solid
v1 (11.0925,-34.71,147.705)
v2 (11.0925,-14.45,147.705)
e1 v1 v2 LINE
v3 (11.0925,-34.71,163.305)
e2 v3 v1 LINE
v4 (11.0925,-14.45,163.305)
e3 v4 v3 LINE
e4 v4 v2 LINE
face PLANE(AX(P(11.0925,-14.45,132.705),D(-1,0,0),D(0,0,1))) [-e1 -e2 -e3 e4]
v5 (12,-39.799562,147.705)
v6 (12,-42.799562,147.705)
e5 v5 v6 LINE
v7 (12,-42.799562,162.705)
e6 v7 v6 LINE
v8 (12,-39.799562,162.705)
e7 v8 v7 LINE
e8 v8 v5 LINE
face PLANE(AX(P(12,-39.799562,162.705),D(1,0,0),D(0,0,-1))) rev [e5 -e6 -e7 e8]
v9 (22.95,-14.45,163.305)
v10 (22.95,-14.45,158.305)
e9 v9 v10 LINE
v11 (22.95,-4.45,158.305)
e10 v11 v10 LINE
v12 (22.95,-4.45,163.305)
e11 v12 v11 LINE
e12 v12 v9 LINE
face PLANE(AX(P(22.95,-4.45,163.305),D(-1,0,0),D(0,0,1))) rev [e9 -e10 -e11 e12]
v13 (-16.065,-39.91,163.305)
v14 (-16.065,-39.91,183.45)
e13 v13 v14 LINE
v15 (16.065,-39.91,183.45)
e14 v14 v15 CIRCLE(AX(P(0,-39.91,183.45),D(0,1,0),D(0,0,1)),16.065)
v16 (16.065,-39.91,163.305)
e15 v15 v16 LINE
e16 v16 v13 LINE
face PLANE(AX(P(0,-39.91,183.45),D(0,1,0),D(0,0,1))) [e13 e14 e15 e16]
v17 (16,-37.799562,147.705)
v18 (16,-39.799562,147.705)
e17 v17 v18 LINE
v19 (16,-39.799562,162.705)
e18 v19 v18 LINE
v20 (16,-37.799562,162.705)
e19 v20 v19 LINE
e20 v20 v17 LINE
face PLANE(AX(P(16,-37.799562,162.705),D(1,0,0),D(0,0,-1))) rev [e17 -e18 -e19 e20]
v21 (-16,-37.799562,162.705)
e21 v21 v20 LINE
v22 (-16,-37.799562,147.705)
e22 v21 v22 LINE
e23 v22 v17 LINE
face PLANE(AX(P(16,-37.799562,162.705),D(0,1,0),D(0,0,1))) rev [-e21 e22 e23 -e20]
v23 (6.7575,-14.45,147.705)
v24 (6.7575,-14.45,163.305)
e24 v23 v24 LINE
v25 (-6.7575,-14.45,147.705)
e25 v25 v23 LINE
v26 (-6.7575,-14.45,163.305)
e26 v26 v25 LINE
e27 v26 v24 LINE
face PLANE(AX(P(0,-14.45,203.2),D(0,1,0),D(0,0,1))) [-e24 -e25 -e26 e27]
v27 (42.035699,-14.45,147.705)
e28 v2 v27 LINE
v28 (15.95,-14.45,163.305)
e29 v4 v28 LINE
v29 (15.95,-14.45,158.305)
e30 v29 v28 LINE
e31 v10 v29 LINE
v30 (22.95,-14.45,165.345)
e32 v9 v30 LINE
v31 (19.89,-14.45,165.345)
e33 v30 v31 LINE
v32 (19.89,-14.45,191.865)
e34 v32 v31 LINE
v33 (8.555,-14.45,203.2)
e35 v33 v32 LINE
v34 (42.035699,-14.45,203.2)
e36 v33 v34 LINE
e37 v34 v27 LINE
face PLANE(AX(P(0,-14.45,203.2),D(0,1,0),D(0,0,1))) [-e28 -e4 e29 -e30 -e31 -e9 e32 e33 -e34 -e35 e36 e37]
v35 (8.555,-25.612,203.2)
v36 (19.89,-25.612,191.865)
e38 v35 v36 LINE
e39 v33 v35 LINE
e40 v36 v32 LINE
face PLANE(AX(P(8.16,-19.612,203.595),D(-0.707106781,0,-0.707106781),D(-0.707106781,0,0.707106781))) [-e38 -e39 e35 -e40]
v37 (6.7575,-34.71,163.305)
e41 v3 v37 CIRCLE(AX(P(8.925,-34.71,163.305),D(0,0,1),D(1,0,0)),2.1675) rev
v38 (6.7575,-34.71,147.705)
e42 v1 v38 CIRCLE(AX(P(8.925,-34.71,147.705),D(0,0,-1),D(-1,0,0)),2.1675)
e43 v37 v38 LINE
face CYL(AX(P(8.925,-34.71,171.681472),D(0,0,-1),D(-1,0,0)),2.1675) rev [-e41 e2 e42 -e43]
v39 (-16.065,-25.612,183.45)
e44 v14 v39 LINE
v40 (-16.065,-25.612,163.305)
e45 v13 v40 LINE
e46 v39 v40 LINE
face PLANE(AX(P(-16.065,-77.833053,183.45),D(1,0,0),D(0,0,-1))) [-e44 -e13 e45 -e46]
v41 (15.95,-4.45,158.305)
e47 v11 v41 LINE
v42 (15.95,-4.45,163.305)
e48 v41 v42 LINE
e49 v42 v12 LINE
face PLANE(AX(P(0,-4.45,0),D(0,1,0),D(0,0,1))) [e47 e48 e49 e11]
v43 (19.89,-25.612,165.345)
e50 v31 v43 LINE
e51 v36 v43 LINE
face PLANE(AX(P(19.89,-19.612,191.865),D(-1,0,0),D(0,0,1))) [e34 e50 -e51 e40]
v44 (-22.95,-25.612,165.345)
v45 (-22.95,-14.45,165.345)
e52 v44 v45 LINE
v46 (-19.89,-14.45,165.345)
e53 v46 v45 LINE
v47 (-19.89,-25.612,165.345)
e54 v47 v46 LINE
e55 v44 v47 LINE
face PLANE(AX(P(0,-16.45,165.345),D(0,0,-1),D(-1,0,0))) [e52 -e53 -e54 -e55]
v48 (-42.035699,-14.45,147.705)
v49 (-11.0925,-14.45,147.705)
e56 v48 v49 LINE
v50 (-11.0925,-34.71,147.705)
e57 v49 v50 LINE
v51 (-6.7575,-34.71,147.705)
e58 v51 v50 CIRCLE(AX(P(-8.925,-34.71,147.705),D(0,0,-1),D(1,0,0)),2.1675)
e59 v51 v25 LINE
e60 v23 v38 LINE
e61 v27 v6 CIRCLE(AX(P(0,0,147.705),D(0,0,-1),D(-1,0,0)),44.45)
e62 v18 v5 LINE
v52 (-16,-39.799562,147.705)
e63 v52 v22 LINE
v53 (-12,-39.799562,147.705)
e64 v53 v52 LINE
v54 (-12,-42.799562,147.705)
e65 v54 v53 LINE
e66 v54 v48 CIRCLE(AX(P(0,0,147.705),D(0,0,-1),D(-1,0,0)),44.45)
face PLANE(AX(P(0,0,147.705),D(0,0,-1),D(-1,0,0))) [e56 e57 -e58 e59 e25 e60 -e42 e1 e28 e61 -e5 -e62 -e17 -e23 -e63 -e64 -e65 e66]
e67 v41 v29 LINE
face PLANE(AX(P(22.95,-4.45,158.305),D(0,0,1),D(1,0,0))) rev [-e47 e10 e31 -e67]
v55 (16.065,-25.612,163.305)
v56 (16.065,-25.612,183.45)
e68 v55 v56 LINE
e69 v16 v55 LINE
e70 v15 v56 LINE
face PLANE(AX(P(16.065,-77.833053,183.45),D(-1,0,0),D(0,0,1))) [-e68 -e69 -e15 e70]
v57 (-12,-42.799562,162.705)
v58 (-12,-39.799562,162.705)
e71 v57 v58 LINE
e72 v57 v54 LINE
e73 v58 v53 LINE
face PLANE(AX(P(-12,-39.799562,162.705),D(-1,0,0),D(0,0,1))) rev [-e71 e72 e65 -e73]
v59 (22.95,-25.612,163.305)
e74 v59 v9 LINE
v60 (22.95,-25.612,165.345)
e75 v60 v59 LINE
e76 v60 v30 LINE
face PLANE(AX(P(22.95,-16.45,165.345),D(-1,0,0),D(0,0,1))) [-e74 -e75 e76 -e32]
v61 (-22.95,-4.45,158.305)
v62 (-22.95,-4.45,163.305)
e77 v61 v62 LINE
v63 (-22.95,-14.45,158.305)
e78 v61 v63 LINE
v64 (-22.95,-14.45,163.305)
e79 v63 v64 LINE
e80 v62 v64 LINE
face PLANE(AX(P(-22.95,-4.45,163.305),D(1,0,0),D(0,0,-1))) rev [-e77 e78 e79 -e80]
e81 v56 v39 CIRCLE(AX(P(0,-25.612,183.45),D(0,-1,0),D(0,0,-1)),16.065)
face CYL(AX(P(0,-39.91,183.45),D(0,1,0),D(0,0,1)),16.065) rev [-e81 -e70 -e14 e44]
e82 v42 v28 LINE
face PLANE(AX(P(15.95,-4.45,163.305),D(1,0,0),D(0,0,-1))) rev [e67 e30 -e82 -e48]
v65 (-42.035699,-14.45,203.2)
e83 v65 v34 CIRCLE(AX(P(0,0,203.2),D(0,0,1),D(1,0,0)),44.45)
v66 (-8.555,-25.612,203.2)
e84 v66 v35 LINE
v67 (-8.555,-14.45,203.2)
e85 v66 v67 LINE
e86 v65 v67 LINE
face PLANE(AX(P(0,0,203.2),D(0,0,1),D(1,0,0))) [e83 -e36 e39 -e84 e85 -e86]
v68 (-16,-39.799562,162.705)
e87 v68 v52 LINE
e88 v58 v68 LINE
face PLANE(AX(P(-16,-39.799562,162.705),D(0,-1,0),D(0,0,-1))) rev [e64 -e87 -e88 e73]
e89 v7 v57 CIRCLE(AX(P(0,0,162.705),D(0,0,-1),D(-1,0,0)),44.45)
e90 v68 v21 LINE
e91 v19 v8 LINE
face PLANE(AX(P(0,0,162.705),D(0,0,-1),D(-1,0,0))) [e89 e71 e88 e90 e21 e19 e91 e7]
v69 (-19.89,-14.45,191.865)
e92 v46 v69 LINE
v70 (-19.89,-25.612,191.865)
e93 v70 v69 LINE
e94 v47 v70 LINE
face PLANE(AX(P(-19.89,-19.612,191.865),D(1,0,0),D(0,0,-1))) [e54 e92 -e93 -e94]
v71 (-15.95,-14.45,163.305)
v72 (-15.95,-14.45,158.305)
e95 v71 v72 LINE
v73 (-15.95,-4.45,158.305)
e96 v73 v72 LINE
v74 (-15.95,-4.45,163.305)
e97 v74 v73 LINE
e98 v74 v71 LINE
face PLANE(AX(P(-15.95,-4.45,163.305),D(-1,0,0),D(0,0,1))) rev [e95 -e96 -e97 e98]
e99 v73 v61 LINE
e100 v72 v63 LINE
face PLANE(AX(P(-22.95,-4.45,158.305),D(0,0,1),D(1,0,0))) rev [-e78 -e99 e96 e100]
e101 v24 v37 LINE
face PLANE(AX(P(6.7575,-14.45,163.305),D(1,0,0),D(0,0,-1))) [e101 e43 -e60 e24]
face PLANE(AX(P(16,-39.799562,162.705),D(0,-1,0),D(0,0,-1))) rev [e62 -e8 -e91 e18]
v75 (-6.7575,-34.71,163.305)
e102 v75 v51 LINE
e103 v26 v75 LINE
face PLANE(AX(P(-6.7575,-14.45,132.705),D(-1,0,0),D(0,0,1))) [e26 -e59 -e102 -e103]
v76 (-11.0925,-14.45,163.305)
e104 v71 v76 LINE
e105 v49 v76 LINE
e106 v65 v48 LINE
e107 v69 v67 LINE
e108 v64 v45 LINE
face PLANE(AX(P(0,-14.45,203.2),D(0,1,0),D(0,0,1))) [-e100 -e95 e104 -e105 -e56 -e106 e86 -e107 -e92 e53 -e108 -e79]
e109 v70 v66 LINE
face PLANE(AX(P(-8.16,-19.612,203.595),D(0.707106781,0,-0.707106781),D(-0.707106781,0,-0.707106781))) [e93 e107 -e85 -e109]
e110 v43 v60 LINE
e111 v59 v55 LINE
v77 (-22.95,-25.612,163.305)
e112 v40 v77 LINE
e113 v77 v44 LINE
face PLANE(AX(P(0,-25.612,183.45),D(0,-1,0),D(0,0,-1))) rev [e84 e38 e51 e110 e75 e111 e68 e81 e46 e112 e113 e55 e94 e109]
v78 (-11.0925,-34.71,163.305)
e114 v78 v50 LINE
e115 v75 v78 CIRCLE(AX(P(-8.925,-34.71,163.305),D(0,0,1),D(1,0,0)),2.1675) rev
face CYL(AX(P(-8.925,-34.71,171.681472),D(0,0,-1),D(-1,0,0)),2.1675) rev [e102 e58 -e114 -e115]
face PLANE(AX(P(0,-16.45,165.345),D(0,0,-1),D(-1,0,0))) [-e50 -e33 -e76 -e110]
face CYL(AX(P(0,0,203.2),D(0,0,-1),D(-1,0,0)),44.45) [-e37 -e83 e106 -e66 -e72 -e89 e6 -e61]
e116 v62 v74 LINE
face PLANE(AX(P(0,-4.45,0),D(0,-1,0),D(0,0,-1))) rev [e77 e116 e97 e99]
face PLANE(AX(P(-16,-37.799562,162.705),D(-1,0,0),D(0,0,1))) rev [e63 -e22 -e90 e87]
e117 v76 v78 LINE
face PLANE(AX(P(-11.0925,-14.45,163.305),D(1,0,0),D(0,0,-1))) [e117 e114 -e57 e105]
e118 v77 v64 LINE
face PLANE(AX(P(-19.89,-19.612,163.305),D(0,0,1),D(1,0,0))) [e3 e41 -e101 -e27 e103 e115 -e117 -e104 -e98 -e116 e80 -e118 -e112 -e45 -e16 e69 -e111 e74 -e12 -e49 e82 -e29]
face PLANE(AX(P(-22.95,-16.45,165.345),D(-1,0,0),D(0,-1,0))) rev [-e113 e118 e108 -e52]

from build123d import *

# Parameters (mm, degrees)
BOSS_EXTRUDE1_DEPTH = 203.2
CAVITY1_START       = -39.91
CAVITY1_DEPTH       = 23.46
CAVITY1_START_2     = -18.031
CAVITY1_2_OUTLINE_W = 6.885
CAVITY1_2_OUTLINE_H = 2.04
CAVITY1_2_OUTLINE_R = 14.28
CAVITY1_2_DEPTH     = 3.581
CAVITY1_START_3     = -19.612
CAVITY1_3_DEPTH     = 3.162
CAVITY1_START_4     = 132.705
CAVITY1_4_OUTLINE_R = 2.1675
CAVITY1_4_DEPTH     = 32.64
CAVITY1_START_5     = 163.305
CAVITY1_5_DEPTH     = 2.04
CAVITY1_6_OUTLINE_R = 2.1675
CAVITY1_6_DEPTH     = 19.992
CAVITY1_7_OUTLINE_R = 2.1675
CAVITY1_7_DEPTH     = 19.992
CUT_EXTRUDE1_DEPTH  = 210.058488467
CUT_EXTRUDE2_DEPTH  = 209.983650662
SKETCH4_W           = 4.335
SKETCH4_H           = 30.6
CUT_EXTRUDE3_DEPTH  = 209.062749189
CUT_EXTRUDE4_DEPTH  = 132.705
CUT_EXTRUDE5_DEPTH  = 15
CUT_EXTRUDE6_DEPTH  = 6
CUT_EXTRUDE7_REACH  = 84.598
SKETCH8_W           = 7
SKETCH8_H           = 5
BOSS_EXTRUDE2_DEPTH = 10
CUT_EXTRUDE8_DEPTH  = 15


with BuildPart() as part:
    # Sketch1 → Boss-Extrude1 (new body)
    with BuildSketch(Plane.XY):
        with BuildLine():
            Line((42.035699114, -14.45), (-42.035699114, -14.45))
            ThreePointArc((-42.035699114, -14.45), (0, -44.45), (42.035699114, -14.45))
        make_face()
    extrude(amount=BOSS_EXTRUDE1_DEPTH)

    # Cavity1: read off the stored shape, not the designer's step
    # Cavity1 outline → Cavity1 (cut)
    with BuildSketch(Plane(origin=(0, 0, 0), x_dir=(1, 0, 0), z_dir=(0, 1, 0)).offset(CAVITY1_START)):
        with BuildLine():
            Line((16.065, -165.345), (16.065, -163.305))
            Line((16.065, -163.305), (-16.065, -163.305))
            Line((-16.065, -163.305), (-16.065, -165.345))
            Line((-16.065, -165.345), (-16.065, -183.45))
            ThreePointArc((-16.065, -183.45), (0, -199.515), (16.065, -183.45))
            Line((16.065, -183.45), (16.065, -165.345))
        make_face()
    extrude(amount=CAVITY1_DEPTH, mode=Mode.SUBTRACT)

    # Cavity1 2 outline → Cavity1 2 (cut)
    with BuildSketch(Plane(origin=(0, 0, 0), x_dir=(1, 0, 0), z_dir=(0, 1, 0)).offset(CAVITY1_START_2)):
        with Locations((19.5075, -164.325)):
            Rectangle(CAVITY1_2_OUTLINE_W, CAVITY1_2_OUTLINE_H)
        with Locations((-19.5075, -164.325)):
            Rectangle(CAVITY1_2_OUTLINE_W, CAVITY1_2_OUTLINE_H)
        with Locations((0, -183.45)):
            Circle(CAVITY1_2_OUTLINE_R)
    extrude(amount=CAVITY1_2_DEPTH, mode=Mode.SUBTRACT)

    # Cavity1 3 outline → Cavity1 3 (cut)
    with BuildSketch(Plane(origin=(0, 0, 0), x_dir=(1, 0, 0), z_dir=(0, 1, 0)).offset(CAVITY1_START_3)):
        with BuildLine():
            Line((19.89, -163.305), (16.065, -163.305))
            Line((16.065, -163.305), (16.065, -183.45))
            ThreePointArc((16.065, -183.45), (0, -199.515), (-16.065, -183.45))
            Line((-16.065, -183.45), (-16.065, -163.305))
            Line((-16.065, -163.305), (-19.89, -163.305))
            Line((-19.89, -163.305), (-19.89, -191.865))
            Line((-19.89, -191.865), (-8.555, -203.2))
            Line((-8.555, -203.2), (8.555, -203.2))
            Line((8.555, -203.2), (19.89, -191.865))
            Line((19.89, -191.865), (19.89, -163.305))
        make_face()
    extrude(amount=CAVITY1_3_DEPTH, mode=Mode.SUBTRACT)

    # Cavity1 4 outline → Cavity1 4 (cut)
    with BuildSketch(Plane.XY.offset(CAVITY1_START_4)):
        with Locations((8.925, -29.71)):
            Circle(CAVITY1_4_OUTLINE_R)
        with Locations((-8.925, -29.71)):
            Circle(CAVITY1_4_OUTLINE_R)
    extrude(amount=CAVITY1_4_DEPTH, mode=Mode.SUBTRACT)

    # Cavity1 5 outline → Cavity1 5 (cut)
    with BuildSketch(Plane.XY.offset(CAVITY1_START_5)):
        Polygon((9.131481481, -14.45), (7.65, -16.45), (16.065, -16.45), (16.065, -14.45), align=None)
        Polygon((-16.065, -16.45), (-7.65, -16.45), (-9.131481481, -14.45), (-16.065, -14.45), align=None)
    extrude(amount=CAVITY1_5_DEPTH, mode=Mode.SUBTRACT)


with BuildPart() as body_2:
    # Cavity1 6 outline → Cavity1 6 (new body)
    with BuildSketch(Plane.XY.offset(CAVITY1_START_5)):
        with Locations((-8.925, -29.71)):
            Circle(CAVITY1_6_OUTLINE_R)
    extrude(amount=CAVITY1_6_DEPTH)


with BuildPart() as body_3:
    # Cavity1 7 outline → Cavity1 7 (new body)
    with BuildSketch(Plane.XY.offset(CAVITY1_START_5)):
        with Locations((8.925, -29.71)):
            Circle(CAVITY1_7_OUTLINE_R)
    extrude(amount=CAVITY1_7_DEPTH)


with BuildPart() as cut_extrude1_tool:
    # Sketch2 → Cut-Extrude1 (new, through all)
    with BuildSketch(Plane(origin=(0, -39.91, 0), x_dir=(1, 0, 0), z_dir=(0, 1, 0))):
        with BuildLine():
            Line((16.065, -183.45), (16.065, -163.305))
            Line((16.065, -163.305), (-16.065, -163.305))
            Line((-16.065, -163.305), (-16.065, -183.45))
            ThreePointArc((-16.065, -183.45), (0, -199.515), (16.065, -183.45))
        make_face()
    extrude(amount=CUT_EXTRUDE1_DEPTH)


with BuildPart() as part_1:
    add(part.part)

    # Cut-Extrude1: cut by cut_extrude1_tool
    add(cut_extrude1_tool.part, mode=Mode.SUBTRACT)

    # Sketch3 → Cut-Extrude2 (cut, through all)
    with BuildSketch(Plane(origin=(0, -19.612, 0), x_dir=(1, 0, 0), z_dir=(0, 1, 0))):
        with BuildLine():
            Line((-8.555, -203.2), (8.555, -203.2))
            Line((8.555, -203.2), (19.89, -191.865))
            Line((19.89, -191.865), (19.89, -163.305))
            Line((19.89, -163.305), (16.065, -163.305))
            Line((16.065, -163.305), (16.065, -183.45))
            ThreePointArc((16.065, -183.45), (0, -199.515), (-16.065, -183.45))
            Line((-16.065, -183.45), (-16.065, -163.305))
            Line((-16.065, -163.305), (-19.89, -163.305))
            Line((-19.89, -163.305), (-19.89, -191.865))
            Line((-19.89, -191.865), (-8.555, -203.2))
        make_face()
    extrude(amount=CUT_EXTRUDE2_DEPTH, mode=Mode.SUBTRACT)

    # Sketch4 → Cut-Extrude3 (cut, through all)
    with BuildSketch(Plane(origin=(0, -29.71, 0), x_dir=(1, 0, 0), z_dir=(0, 1, 0))):
        with Locations((-8.925, -148.005)):
            Rectangle(SKETCH4_W, SKETCH4_H)
        with Locations((8.925, -148.005)):
            Rectangle(SKETCH4_W, SKETCH4_H)
    extrude(amount=CUT_EXTRUDE3_DEPTH, mode=Mode.SUBTRACT)

    # Sketch1<3> → Cut-Extrude4 (cut)
    with BuildSketch(Plane.XY):
        with BuildLine():
            ThreePointArc((44.45, 0), (-7.325151001, 43.842270274), (-42.035699114, -14.45))
            Line((-42.035699114, -14.45), (42.035699114, -14.45))
            ThreePointArc((42.035699114, -14.45), (43.842270274, -7.325151001), (44.45, 0))
        make_face()
        with BuildLine():
            Line((42.035699114, -14.45), (-42.035699114, -14.45))
            ThreePointArc((-42.035699114, -14.45), (0, -44.45), (42.035699114, -14.45))
        make_face()
    extrude(amount=CUT_EXTRUDE4_DEPTH, mode=Mode.SUBTRACT)

    # Sketch5 → Cut-Extrude5 (cut)
    with BuildSketch(Plane(origin=(0, 0, 132.705), x_dir=(-1, 0, 0), z_dir=(0, 0, -1))):
        with BuildLine():
            Line((6.7575, -29.71), (6.7575, -14.45))
            Line((6.7575, -14.45), (-6.7575, -14.45))
            Line((-6.7575, -14.45), (-6.7575, -29.71))
            ThreePointArc((-6.7575, -29.71), (-8.925, -31.8775), (-11.0925, -29.71))
            Line((-11.0925, -29.71), (-11.0925, -14.45))
            Line((-11.0925, -14.45), (-42.035699114, -14.45))
            ThreePointArc((-42.035699114, -14.45), (0, -44.45), (42.035699114, -14.45))
            Line((42.035699114, -14.45), (11.0925, -14.45))
            Line((11.0925, -14.45), (11.0925, -29.71))
            ThreePointArc((11.0925, -29.71), (8.925, -31.8775), (6.7575, -29.71))
        make_face()
    extrude(amount=-CUT_EXTRUDE5_DEPTH, mode=Mode.SUBTRACT)

    # Sketch6 → Cut-Extrude6 (cut, symmetric)
    with BuildSketch(Plane(origin=(0, -19.612, 0), x_dir=(1, 0, 0), z_dir=(0, 1, 0))):
        with BuildLine():
            Line((-16.065, -163.305), (-22.95, -163.305))
            Line((-22.95, -163.305), (-22.95, -165.345))
            Line((-22.95, -165.345), (-19.89, -165.345))
            Line((-19.89, -165.345), (-19.89, -191.865))
            Line((-19.89, -191.865), (-8.555, -203.2))
            Line((-8.555, -203.2), (8.555, -203.2))
            Line((8.555, -203.2), (19.89, -191.865))
            Line((19.89, -191.865), (19.89, -165.345))
            Line((19.89, -165.345), (22.95, -165.345))
            Line((22.95, -165.345), (22.95, -163.305))
            Line((22.95, -163.305), (16.065, -163.305))
            Line((16.065, -163.305), (16.065, -183.45))
            ThreePointArc((16.065, -183.45), (0, -199.515), (-16.065, -183.45))
            Line((-16.065, -183.45), (-16.065, -163.305))
        make_face()
    extrude(amount=CUT_EXTRUDE6_DEPTH, both=True, mode=Mode.SUBTRACT)

    # Sketch7 → Cut-Extrude7 (cut, up to next)
    with BuildSketch(Plane(origin=(0, 0, 147.705), x_dir=(-1, 0, 0), z_dir=(0, 0, -1)), mode=Mode.PRIVATE) as cut_extrude7_sk1:
        with BuildLine():
            Line((-11.0925, -29.71), (-11.0925, -34.71))
            ThreePointArc((-11.0925, -34.71), (-8.925, -36.8775), (-6.7575, -34.71))
            Line((-6.7575, -34.71), (-6.7575, -29.71))
            Line((-6.7575, -29.71), (-11.0925, -29.71))
        make_face()
    cut_extrude7_tool1 = extrude(cut_extrude7_sk1.sketch, amount=-CUT_EXTRUDE7_REACH, mode=Mode.PRIVATE) & part_1.part
    # Sketch7 → Cut-Extrude7 (cut, up to next)
    with BuildSketch(Plane(origin=(0, 0, 147.705), x_dir=(-1, 0, 0), z_dir=(0, 0, -1)), mode=Mode.PRIVATE) as cut_extrude7_sk2:
        with BuildLine():
            Line((11.0925, -29.71), (11.0925, -34.71))
            ThreePointArc((11.0925, -34.71), (8.925, -36.8775), (6.7575, -34.71))
            Line((6.7575, -34.71), (6.7575, -29.71))
            Line((6.7575, -29.71), (11.0925, -29.71))
        make_face()
    cut_extrude7_tool2 = extrude(cut_extrude7_sk2.sketch, amount=-CUT_EXTRUDE7_REACH, mode=Mode.PRIVATE) & part_1.part
    add(cut_extrude7_tool1.solids().sort_by_distance((8.925, -33.078635, 147.705))[0], mode=Mode.SUBTRACT)
    add(cut_extrude7_tool2.solids().sort_by_distance((-8.925, -33.078635, 147.705))[0], mode=Mode.SUBTRACT)

    # Sketch8 → Boss-Extrude2 (add)
    with BuildSketch(Plane(origin=(0, -14.45, 0), x_dir=(1, 0, 0), z_dir=(0, 1, 0))):
        with Locations((-19.45, -160.805)):
            Rectangle(SKETCH8_W, SKETCH8_H)
        with Locations((19.45, -160.805)):
            Rectangle(SKETCH8_W, SKETCH8_H)
    extrude(amount=BOSS_EXTRUDE2_DEPTH)

    # Sketch9 → Cut-Extrude8 (cut)
    with BuildSketch(Plane(origin=(0, 0, 147.705), x_dir=(-1, 0, 0), z_dir=(0, 0, -1))):
        with BuildLine():
            Line((-12, -39.799561914), (-12, -42.799561914))
            ThreePointArc((-12, -42.799561914), (0, -44.45), (12, -42.799561914))
            Line((12, -42.799561914), (12, -39.799561914))
            Line((12, -39.799561914), (16, -39.799561914))
            Line((16, -39.799561914), (16, -37.799561914))
            Line((16, -37.799561914), (-16, -37.799561914))
            Line((-16, -37.799561914), (-16, -39.799561914))
            Line((-16, -39.799561914), (-12, -39.799561914))
        make_face()
    extrude(amount=-CUT_EXTRUDE8_DEPTH, mode=Mode.SUBTRACT)


with BuildPart() as body_2_1:
    add(body_2.part)

    # Cut-Extrude1: cut by cut_extrude1_tool
    add(cut_extrude1_tool.part, mode=Mode.SUBTRACT)


with BuildPart() as body_3_1:
    add(body_3.part)

    # Cut-Extrude1: cut by cut_extrude1_tool
    add(cut_extrude1_tool.part, mode=Mode.SUBTRACT)


solid = part_1.part
